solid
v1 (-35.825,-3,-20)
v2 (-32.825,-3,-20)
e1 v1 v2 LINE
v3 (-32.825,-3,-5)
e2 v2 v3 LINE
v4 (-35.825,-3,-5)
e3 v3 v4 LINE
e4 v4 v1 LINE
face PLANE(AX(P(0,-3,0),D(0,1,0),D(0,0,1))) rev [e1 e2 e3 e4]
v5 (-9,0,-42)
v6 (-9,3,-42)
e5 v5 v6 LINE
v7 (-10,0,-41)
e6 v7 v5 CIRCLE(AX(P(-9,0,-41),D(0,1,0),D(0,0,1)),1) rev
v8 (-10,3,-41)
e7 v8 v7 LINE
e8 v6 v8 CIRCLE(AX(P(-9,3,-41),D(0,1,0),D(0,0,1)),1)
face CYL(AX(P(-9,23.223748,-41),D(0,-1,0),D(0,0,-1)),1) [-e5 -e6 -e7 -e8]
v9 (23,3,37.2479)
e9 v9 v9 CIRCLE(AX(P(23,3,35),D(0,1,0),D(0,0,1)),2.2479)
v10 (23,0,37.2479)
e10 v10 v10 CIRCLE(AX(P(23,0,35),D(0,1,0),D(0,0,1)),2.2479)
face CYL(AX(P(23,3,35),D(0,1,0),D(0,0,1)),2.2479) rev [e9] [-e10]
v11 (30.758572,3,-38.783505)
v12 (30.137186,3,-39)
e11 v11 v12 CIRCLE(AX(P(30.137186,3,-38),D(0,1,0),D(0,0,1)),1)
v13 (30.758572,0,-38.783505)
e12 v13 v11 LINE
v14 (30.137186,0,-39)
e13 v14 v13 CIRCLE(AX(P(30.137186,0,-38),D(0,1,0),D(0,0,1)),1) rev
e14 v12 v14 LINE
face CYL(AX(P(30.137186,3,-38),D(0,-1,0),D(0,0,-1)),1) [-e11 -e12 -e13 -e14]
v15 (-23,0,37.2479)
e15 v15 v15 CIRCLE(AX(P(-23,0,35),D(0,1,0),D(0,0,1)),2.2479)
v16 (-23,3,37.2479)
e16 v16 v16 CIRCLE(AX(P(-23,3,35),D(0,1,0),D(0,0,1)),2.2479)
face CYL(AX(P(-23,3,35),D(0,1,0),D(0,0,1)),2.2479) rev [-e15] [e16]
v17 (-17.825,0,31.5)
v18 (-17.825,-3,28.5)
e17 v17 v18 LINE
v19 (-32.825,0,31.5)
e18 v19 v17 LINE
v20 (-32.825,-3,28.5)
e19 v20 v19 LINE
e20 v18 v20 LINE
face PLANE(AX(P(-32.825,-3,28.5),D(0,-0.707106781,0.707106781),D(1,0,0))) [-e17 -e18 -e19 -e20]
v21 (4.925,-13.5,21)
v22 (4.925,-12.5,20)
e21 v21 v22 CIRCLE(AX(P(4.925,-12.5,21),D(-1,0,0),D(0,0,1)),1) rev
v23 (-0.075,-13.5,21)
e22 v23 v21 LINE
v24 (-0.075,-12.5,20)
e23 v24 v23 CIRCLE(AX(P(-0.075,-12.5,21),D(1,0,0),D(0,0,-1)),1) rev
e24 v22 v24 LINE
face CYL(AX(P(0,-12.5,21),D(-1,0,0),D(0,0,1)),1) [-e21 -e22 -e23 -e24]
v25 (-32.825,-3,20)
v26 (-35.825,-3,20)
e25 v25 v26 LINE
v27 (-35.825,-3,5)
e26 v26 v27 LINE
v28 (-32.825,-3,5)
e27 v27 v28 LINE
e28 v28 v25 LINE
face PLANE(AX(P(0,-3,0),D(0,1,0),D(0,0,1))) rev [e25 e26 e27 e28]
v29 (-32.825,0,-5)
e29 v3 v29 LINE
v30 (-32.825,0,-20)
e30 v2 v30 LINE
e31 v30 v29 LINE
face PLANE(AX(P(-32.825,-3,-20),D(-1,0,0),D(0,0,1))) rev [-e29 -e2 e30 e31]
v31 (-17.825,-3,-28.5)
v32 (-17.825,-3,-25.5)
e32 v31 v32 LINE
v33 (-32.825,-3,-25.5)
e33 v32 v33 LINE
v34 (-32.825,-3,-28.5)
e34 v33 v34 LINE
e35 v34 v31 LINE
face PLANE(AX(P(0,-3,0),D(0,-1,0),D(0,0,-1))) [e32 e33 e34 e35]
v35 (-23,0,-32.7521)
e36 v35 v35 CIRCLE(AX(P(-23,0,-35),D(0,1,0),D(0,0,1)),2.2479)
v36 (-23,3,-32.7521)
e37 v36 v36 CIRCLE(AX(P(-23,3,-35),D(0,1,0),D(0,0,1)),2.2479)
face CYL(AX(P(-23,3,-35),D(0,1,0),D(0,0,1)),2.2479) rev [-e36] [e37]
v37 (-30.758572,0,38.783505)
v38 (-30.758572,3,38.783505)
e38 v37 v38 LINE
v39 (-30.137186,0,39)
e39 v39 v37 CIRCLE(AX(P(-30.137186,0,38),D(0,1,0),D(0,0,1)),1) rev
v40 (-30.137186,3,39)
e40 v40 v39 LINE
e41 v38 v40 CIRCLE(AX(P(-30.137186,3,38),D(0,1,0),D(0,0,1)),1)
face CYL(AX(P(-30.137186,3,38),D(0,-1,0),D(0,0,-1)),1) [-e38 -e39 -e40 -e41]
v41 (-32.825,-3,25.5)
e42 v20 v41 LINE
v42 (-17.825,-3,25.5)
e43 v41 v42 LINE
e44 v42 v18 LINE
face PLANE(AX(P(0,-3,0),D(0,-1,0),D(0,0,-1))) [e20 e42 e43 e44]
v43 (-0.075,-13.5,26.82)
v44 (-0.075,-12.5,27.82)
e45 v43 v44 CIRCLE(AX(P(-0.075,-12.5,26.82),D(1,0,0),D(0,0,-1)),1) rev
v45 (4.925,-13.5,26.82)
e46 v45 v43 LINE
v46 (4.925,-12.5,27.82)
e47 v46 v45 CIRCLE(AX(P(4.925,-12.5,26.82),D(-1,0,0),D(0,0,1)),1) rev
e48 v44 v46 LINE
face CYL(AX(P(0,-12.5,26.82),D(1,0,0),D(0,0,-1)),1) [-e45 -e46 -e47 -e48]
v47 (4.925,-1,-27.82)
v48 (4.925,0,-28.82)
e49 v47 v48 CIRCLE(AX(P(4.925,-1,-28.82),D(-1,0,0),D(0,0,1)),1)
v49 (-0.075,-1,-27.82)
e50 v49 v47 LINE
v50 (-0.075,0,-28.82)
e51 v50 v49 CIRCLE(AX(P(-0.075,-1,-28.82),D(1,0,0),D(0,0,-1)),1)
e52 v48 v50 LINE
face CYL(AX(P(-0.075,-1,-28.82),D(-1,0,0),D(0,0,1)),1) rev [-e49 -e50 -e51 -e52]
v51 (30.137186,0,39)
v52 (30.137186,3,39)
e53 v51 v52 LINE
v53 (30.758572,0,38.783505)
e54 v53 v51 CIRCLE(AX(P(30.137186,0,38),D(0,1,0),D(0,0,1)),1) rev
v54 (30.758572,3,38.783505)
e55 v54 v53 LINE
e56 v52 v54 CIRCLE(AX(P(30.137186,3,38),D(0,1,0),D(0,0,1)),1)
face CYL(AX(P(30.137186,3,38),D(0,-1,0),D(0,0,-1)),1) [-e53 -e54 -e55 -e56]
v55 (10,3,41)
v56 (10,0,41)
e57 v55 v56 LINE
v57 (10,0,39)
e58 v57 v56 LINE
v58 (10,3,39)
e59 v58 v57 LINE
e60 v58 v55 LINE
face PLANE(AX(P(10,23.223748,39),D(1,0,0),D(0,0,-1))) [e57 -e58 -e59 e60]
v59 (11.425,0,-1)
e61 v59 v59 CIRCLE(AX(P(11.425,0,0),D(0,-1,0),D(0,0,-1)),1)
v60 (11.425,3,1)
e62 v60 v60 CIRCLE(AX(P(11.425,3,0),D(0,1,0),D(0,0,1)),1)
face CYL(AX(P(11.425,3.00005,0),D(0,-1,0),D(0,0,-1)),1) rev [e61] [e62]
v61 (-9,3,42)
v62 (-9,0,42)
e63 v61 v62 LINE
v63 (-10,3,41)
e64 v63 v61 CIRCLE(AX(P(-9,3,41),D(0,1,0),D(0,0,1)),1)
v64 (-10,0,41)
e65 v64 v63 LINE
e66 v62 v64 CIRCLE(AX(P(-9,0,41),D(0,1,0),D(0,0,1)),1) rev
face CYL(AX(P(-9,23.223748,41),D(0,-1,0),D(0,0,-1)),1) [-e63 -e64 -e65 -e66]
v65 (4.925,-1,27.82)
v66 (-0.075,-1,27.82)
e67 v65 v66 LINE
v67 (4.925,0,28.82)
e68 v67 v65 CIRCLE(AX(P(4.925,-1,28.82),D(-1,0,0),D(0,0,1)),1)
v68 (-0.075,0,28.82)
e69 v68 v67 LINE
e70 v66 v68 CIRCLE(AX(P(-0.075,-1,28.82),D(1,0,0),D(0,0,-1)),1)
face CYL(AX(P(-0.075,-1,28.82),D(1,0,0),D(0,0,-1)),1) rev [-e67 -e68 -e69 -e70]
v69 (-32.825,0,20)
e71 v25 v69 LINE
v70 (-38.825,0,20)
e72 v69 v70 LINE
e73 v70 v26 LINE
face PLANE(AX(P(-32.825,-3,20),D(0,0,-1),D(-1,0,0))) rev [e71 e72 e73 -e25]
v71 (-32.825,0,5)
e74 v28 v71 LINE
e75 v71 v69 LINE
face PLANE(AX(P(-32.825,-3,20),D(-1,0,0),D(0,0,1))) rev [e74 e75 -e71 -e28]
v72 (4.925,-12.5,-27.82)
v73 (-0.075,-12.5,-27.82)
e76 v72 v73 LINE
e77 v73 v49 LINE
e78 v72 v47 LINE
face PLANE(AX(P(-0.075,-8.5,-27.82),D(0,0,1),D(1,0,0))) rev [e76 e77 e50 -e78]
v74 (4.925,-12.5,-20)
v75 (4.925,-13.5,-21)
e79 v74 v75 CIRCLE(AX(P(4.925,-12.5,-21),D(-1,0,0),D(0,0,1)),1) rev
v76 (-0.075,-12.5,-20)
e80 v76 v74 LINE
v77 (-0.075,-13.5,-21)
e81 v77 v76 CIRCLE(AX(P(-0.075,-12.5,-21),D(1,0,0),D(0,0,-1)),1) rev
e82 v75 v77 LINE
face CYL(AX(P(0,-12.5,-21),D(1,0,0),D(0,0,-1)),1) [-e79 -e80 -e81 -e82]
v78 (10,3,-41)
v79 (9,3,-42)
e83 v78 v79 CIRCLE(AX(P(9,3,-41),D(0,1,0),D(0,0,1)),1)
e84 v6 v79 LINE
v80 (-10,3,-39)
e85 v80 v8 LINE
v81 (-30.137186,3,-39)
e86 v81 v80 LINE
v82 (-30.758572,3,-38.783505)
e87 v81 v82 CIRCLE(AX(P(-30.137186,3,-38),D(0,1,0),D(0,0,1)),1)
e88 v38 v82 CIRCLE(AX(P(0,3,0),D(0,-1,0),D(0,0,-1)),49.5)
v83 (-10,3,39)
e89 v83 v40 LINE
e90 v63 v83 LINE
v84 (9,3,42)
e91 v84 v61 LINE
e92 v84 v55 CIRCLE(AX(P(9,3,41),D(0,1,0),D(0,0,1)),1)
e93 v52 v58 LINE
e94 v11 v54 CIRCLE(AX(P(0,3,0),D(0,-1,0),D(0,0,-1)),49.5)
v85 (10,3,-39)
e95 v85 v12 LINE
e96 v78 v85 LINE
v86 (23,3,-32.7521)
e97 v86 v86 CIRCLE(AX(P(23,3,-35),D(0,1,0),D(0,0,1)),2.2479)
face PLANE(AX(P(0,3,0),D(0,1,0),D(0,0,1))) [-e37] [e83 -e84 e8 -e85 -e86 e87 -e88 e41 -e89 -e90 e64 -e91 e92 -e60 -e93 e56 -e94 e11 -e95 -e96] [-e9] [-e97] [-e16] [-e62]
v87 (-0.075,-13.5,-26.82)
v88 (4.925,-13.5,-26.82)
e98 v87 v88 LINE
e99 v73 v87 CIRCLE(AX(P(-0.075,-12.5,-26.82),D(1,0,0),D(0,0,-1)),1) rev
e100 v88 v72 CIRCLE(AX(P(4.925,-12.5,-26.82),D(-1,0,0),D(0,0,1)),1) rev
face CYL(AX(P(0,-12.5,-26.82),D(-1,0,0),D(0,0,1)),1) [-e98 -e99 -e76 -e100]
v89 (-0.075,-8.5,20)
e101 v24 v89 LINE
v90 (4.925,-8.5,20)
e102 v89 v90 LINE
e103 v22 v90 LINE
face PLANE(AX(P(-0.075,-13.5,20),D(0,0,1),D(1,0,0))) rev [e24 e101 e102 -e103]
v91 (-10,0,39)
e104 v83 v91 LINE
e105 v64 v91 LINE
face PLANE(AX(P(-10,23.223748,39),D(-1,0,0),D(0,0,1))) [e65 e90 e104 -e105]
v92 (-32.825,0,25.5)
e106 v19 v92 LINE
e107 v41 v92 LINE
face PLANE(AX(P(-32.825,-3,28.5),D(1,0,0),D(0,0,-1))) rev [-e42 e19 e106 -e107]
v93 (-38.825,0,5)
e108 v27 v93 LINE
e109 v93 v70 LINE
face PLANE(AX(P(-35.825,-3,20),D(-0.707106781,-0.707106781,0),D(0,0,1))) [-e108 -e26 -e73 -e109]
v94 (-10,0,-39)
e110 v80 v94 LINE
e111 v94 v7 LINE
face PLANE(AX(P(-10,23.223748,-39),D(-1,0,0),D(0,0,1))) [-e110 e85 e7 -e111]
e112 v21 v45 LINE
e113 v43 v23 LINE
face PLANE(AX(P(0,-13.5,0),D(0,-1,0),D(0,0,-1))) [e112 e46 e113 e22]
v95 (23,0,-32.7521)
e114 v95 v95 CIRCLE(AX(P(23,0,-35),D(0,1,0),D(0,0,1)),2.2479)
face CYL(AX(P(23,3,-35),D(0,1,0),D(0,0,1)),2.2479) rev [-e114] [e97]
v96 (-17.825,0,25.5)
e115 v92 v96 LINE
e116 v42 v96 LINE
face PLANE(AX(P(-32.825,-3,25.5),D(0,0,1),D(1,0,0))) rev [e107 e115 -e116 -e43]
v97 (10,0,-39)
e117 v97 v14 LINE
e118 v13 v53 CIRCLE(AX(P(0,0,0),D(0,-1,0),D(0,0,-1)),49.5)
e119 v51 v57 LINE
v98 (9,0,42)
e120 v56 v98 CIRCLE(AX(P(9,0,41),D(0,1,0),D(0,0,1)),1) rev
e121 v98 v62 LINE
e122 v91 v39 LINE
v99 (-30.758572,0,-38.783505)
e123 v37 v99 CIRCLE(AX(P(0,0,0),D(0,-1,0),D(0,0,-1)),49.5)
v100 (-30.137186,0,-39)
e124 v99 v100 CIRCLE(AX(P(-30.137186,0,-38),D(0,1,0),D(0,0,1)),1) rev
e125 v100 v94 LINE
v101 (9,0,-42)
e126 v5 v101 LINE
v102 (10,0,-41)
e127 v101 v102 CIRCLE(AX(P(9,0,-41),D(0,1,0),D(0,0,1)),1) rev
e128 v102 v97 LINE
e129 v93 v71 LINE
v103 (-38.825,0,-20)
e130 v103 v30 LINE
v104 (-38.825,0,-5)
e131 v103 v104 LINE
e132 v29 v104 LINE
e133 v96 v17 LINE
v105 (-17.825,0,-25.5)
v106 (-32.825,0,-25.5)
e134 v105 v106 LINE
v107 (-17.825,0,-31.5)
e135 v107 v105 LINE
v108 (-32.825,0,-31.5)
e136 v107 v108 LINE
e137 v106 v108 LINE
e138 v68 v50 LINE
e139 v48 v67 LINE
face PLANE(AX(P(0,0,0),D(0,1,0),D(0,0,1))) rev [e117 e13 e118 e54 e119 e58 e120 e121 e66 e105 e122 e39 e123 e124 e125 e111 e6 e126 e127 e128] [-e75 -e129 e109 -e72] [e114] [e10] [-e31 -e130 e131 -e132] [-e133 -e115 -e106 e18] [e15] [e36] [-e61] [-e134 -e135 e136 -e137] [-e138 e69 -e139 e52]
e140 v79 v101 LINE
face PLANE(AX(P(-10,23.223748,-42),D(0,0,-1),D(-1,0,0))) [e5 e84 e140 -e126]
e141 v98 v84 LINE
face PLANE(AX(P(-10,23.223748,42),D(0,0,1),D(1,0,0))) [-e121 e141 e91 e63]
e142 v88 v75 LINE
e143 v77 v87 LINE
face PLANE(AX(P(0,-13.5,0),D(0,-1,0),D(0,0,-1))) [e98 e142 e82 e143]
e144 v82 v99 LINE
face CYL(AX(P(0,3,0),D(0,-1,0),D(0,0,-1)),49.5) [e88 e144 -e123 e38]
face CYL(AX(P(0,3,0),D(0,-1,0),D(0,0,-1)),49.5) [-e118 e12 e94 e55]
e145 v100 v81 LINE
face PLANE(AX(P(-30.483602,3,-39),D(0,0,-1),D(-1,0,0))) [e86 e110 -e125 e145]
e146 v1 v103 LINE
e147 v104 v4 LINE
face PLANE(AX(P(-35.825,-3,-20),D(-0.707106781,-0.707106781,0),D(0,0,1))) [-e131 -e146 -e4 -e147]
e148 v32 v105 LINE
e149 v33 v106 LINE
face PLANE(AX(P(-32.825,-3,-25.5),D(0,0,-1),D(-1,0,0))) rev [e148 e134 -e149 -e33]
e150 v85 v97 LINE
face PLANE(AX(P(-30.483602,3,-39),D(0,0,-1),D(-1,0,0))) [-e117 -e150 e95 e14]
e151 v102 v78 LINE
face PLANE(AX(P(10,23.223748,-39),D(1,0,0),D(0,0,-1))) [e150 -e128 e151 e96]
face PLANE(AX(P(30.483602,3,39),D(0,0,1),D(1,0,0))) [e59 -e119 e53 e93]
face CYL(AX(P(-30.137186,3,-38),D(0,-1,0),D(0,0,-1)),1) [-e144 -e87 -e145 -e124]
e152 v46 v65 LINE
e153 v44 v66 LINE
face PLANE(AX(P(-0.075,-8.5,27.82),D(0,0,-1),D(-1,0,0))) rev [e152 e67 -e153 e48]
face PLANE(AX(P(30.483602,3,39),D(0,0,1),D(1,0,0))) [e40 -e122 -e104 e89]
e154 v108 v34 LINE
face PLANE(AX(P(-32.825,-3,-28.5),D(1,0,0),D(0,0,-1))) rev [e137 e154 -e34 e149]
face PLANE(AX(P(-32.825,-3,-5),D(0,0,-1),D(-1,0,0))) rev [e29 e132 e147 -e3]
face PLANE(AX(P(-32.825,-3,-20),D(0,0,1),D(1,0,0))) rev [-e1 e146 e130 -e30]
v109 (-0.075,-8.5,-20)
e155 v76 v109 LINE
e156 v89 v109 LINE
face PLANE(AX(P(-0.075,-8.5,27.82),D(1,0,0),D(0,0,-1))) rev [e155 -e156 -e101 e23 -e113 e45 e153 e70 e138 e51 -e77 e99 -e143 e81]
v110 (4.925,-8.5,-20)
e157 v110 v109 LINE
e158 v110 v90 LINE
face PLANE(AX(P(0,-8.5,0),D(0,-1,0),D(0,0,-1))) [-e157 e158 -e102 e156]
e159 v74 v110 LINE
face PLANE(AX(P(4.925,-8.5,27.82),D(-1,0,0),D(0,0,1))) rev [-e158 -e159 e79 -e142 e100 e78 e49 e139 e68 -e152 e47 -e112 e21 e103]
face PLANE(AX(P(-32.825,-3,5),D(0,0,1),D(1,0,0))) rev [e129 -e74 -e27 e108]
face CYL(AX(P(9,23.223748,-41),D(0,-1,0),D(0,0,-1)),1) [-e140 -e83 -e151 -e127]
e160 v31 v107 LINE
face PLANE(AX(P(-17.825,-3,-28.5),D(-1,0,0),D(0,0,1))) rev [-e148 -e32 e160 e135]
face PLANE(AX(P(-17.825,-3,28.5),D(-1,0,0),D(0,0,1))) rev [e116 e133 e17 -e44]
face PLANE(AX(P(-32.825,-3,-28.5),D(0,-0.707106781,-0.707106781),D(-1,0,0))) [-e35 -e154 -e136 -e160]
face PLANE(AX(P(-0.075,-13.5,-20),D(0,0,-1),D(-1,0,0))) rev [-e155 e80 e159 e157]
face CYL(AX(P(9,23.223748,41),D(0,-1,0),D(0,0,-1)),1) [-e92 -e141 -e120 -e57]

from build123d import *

# Parameters (mm, degrees)
A_BASE_T42_OUTLINE_R          = 2.2479
A_BASE_T42_OUTLINE_R_2        = 1
A_BASE_T42_DEPTH              = 3
OUTER_RIM_CUT_DEPTH           = 68.299702823
SKETCH2_W                     = 20
SKETCH2_H                     = 3
FLANGES_DEPTH                 = 3
CONTOURING_R                  = 1
SKETCH9_R                     = 1
SINGLE_TENDON_PORT_DEPTH      = 65.986537067
SKETCH3_W                     = 15
SKETCH3_H                     = 3
SKETCH3_W_2                   = 3
SKETCH3_H_2                   = 15
BASE_SUPPORTS_DEPTH           = 3
BASE_SUPPORTS_CHAMFER_SIZE    = 3
SKETCH10_R                    = 1
COVER_DEPTH                   = 3
SKETCH6_W                     = 5
SKETCH6_H                     = 55.64
SERVO_SIDE_SUPPORTS_DEPTH     = 8.5
SKETCH7_W                     = 5
SKETCH7_H                     = 7.82
SERVO_SIDE_SUPPORT_ENDS_DEPTH = 5
SERVO_CONTOURING_R            = 1


with BuildPart() as part:
    # a_base_t42: read off the stored shape, not the designer's step
    # a_base_t42 outline → a_base_t42 (new body)
    with BuildSketch(Plane(origin=(0, 0, 0), x_dir=(1, 0, 0), z_dir=(0, 1, 0))):
        with BuildLine():
            ThreePointArc((31.5, -42), (52.5, 0), (31.5, 42))
            Line((31.5, 42), (-31.5, 42))
            ThreePointArc((-31.5, 42), (-52.5, 0), (-31.5, -42))
            Line((-31.5, -42), (31.5, -42))
        make_face()
        with Locations((-23, -35)):
            Circle(A_BASE_T42_OUTLINE_R, mode=Mode.SUBTRACT)
        with Locations((23, -35)):
            Circle(A_BASE_T42_OUTLINE_R, mode=Mode.SUBTRACT)
        with Locations((-40.25, 0)):
            Circle(A_BASE_T42_OUTLINE_R_2, mode=Mode.SUBTRACT)
        with Locations((-23, 35)):
            Circle(A_BASE_T42_OUTLINE_R, mode=Mode.SUBTRACT)
        with Locations((40.25, 0)):
            Circle(A_BASE_T42_OUTLINE_R_2, mode=Mode.SUBTRACT)
        with Locations((23, 35)):
            Circle(A_BASE_T42_OUTLINE_R, mode=Mode.SUBTRACT)
    extrude(amount=A_BASE_T42_DEPTH)

    # Sketch1 → Outer Rim Cut (cut, through all)
    with BuildSketch(Plane.XZ):
        with BuildLine():
            Line((31.5, 42), (-31.5, 42))
            ThreePointArc((-31.5, 42), (-52.5, 0), (-31.5, -42))
            Line((-31.5, -42), (31.5, -42))
            ThreePointArc((31.5, -42), (52.5, 0), (31.5, 42))
        make_face()
        with BuildLine():
            Line((30.483602149, 39), (-30.483602149, 39))
            ThreePointArc((-30.483602149, 39), (-49.5, 0), (-30.483602149, -39))
            Line((-30.483602149, -39), (30.483602149, -39))
            ThreePointArc((30.483602149, -39), (49.5, 0), (30.483602149, 39))
        make_face(mode=Mode.SUBTRACT)
    extrude(amount=-OUTER_RIM_CUT_DEPTH, mode=Mode.SUBTRACT)

    # Sketch2 → Flanges (add)
    with BuildSketch(Plane.XZ):
        with Locations((0, -40.5)):
            Rectangle(SKETCH2_W, SKETCH2_H)
        with Locations((0, 40.5)):
            Rectangle(SKETCH2_W, SKETCH2_H)
    extrude(amount=-FLANGES_DEPTH)

    # Contouring
    contouring_edges = [part.edges().sort_by_distance(p)[0] for p in [
        (30.483602149, 1.5, -39),
        (-30.483602149, 1.5, -39),
        (10, 1.5, -42),
        (-10, 1.5, -42),
        (30.483602149, 1.5, 39),
        (-30.483602149, 1.5, 39),
        (10, 1.5, 42),
        (-10, 1.5, 42),
    ]]
    fillet(contouring_edges, radius=CONTOURING_R)

    # Sketch9 → Single Tendon Port (cut, through all)
    with BuildSketch(Plane.XZ):
        with Locations(Location((11.425, 0, 0), (0, 0, 270))):
            Circle(SKETCH9_R)
    extrude(amount=-SINGLE_TENDON_PORT_DEPTH, mode=Mode.SUBTRACT)

    # Sketch3 → Base Supports (add)
    with BuildSketch(Plane.XZ):
        with Locations((-25.325, -27)):
            Rectangle(SKETCH3_W, SKETCH3_H)
        with Locations((-25.325, 27)):
            Rectangle(SKETCH3_W, SKETCH3_H)
        with Locations((-34.325, -12.5)):
            Rectangle(SKETCH3_W_2, SKETCH3_H_2)
        with Locations((-34.325, 12.5)):
            Rectangle(SKETCH3_W_2, SKETCH3_H_2)
    extrude(amount=BASE_SUPPORTS_DEPTH)

    # Base Supports Chamfer
    # the kernel refuses this chamfer: 3 mm, written as the material it adds along each edge
    with BuildSketch(Plane(origin=(-32.825, 0, 28.5), x_dir=(0, 0, 1), z_dir=(1, 0, 0))) as base_supports_chamfer_piece_1_section:
        Polygon((BASE_SUPPORTS_CHAMFER_SIZE, 0), (0, BASE_SUPPORTS_CHAMFER_SIZE), (0, 0), align=None)
    base_supports_chamfer_piece_1 = extrude(amount=15, mode=Mode.PRIVATE)
    base_supports_chamfer_piece_1 = split(base_supports_chamfer_piece_1, bisect_by=Plane(origin=(-32.825, -3, 28.5), z_dir=(0, 1, 0)), keep=Keep.TOP, mode=Mode.PRIVATE)
    add(base_supports_chamfer_piece_1)
    with BuildSketch(Plane(origin=(-17.825, 0, -28.5), x_dir=(0, 0, -1), z_dir=(-1, 0, 0))) as base_supports_chamfer_piece_2_section:
        Polygon((BASE_SUPPORTS_CHAMFER_SIZE, 0), (0, BASE_SUPPORTS_CHAMFER_SIZE), (0, 0), align=None)
    base_supports_chamfer_piece_2 = extrude(amount=15, mode=Mode.PRIVATE)
    base_supports_chamfer_piece_2 = split(base_supports_chamfer_piece_2, bisect_by=Plane(origin=(-17.825, -3, -28.5), z_dir=(0, 1, 0)), keep=Keep.TOP, mode=Mode.PRIVATE)
    add(base_supports_chamfer_piece_2)
    with BuildSketch(Plane(origin=(-35.825, 0, 20), x_dir=(-1, 0, 0), z_dir=(0, 0, -1))) as base_supports_chamfer_piece_3_section:
        Polygon((BASE_SUPPORTS_CHAMFER_SIZE, 0), (0, -BASE_SUPPORTS_CHAMFER_SIZE), (0, 0), align=None)
    base_supports_chamfer_piece_3 = extrude(amount=15, mode=Mode.PRIVATE)
    base_supports_chamfer_piece_3 = split(base_supports_chamfer_piece_3, bisect_by=Plane(origin=(-35.825, -3, 20), z_dir=(0, 1, 0)), keep=Keep.TOP, mode=Mode.PRIVATE)
    add(base_supports_chamfer_piece_3)
    with BuildSketch(Plane(origin=(-35.825, 0, -20), x_dir=(-1, 0, 0), z_dir=(0, 0, 1))) as base_supports_chamfer_piece_4_section:
        Polygon((BASE_SUPPORTS_CHAMFER_SIZE, 0), (0, BASE_SUPPORTS_CHAMFER_SIZE), (0, 0), align=None)
    base_supports_chamfer_piece_4 = extrude(amount=15, mode=Mode.PRIVATE)
    base_supports_chamfer_piece_4 = split(base_supports_chamfer_piece_4, bisect_by=Plane(origin=(-35.825, -3, -20), z_dir=(0, 1, 0)), keep=Keep.TOP, mode=Mode.PRIVATE)
    add(base_supports_chamfer_piece_4)

    # Sketch10 → Cover (add)
    with BuildSketch(Plane.XZ):
        with Locations((-40.25, 0)):
            Circle(SKETCH10_R)
        with Locations((40.25, 0)):
            Circle(SKETCH10_R)
    extrude(amount=-COVER_DEPTH)

    # Sketch6 → Servo Side Supports (add)
    with BuildSketch(Plane.XZ):
        with Locations((2.425, 0)):
            Rectangle(SKETCH6_W, SKETCH6_H)
    extrude(amount=SERVO_SIDE_SUPPORTS_DEPTH)

    # Sketch7 → Servo Side Support Ends (add)
    with BuildSketch(Plane.XZ.offset(8.5)):
        with Locations((2.425, 23.91)):
            Rectangle(SKETCH7_W, SKETCH7_H)
        with Locations((2.425, -23.91)):
            Rectangle(SKETCH7_W, SKETCH7_H)
    extrude(amount=SERVO_SIDE_SUPPORT_ENDS_DEPTH)

    # Servo Contouring
    servo_contouring_edges = [part.edges().sort_by_distance(p)[0] for p in [
        (2.425, 0, -27.82),
        (2.425, 0, 27.82),
        (2.425, -13.5, 20),
        (2.425, -13.5, 27.82),
        (2.425, -13.5, -27.82),
        (2.425, -13.5, -20),
    ]]
    fillet(servo_contouring_edges, radius=SERVO_CONTOURING_R)


solid = part.part
